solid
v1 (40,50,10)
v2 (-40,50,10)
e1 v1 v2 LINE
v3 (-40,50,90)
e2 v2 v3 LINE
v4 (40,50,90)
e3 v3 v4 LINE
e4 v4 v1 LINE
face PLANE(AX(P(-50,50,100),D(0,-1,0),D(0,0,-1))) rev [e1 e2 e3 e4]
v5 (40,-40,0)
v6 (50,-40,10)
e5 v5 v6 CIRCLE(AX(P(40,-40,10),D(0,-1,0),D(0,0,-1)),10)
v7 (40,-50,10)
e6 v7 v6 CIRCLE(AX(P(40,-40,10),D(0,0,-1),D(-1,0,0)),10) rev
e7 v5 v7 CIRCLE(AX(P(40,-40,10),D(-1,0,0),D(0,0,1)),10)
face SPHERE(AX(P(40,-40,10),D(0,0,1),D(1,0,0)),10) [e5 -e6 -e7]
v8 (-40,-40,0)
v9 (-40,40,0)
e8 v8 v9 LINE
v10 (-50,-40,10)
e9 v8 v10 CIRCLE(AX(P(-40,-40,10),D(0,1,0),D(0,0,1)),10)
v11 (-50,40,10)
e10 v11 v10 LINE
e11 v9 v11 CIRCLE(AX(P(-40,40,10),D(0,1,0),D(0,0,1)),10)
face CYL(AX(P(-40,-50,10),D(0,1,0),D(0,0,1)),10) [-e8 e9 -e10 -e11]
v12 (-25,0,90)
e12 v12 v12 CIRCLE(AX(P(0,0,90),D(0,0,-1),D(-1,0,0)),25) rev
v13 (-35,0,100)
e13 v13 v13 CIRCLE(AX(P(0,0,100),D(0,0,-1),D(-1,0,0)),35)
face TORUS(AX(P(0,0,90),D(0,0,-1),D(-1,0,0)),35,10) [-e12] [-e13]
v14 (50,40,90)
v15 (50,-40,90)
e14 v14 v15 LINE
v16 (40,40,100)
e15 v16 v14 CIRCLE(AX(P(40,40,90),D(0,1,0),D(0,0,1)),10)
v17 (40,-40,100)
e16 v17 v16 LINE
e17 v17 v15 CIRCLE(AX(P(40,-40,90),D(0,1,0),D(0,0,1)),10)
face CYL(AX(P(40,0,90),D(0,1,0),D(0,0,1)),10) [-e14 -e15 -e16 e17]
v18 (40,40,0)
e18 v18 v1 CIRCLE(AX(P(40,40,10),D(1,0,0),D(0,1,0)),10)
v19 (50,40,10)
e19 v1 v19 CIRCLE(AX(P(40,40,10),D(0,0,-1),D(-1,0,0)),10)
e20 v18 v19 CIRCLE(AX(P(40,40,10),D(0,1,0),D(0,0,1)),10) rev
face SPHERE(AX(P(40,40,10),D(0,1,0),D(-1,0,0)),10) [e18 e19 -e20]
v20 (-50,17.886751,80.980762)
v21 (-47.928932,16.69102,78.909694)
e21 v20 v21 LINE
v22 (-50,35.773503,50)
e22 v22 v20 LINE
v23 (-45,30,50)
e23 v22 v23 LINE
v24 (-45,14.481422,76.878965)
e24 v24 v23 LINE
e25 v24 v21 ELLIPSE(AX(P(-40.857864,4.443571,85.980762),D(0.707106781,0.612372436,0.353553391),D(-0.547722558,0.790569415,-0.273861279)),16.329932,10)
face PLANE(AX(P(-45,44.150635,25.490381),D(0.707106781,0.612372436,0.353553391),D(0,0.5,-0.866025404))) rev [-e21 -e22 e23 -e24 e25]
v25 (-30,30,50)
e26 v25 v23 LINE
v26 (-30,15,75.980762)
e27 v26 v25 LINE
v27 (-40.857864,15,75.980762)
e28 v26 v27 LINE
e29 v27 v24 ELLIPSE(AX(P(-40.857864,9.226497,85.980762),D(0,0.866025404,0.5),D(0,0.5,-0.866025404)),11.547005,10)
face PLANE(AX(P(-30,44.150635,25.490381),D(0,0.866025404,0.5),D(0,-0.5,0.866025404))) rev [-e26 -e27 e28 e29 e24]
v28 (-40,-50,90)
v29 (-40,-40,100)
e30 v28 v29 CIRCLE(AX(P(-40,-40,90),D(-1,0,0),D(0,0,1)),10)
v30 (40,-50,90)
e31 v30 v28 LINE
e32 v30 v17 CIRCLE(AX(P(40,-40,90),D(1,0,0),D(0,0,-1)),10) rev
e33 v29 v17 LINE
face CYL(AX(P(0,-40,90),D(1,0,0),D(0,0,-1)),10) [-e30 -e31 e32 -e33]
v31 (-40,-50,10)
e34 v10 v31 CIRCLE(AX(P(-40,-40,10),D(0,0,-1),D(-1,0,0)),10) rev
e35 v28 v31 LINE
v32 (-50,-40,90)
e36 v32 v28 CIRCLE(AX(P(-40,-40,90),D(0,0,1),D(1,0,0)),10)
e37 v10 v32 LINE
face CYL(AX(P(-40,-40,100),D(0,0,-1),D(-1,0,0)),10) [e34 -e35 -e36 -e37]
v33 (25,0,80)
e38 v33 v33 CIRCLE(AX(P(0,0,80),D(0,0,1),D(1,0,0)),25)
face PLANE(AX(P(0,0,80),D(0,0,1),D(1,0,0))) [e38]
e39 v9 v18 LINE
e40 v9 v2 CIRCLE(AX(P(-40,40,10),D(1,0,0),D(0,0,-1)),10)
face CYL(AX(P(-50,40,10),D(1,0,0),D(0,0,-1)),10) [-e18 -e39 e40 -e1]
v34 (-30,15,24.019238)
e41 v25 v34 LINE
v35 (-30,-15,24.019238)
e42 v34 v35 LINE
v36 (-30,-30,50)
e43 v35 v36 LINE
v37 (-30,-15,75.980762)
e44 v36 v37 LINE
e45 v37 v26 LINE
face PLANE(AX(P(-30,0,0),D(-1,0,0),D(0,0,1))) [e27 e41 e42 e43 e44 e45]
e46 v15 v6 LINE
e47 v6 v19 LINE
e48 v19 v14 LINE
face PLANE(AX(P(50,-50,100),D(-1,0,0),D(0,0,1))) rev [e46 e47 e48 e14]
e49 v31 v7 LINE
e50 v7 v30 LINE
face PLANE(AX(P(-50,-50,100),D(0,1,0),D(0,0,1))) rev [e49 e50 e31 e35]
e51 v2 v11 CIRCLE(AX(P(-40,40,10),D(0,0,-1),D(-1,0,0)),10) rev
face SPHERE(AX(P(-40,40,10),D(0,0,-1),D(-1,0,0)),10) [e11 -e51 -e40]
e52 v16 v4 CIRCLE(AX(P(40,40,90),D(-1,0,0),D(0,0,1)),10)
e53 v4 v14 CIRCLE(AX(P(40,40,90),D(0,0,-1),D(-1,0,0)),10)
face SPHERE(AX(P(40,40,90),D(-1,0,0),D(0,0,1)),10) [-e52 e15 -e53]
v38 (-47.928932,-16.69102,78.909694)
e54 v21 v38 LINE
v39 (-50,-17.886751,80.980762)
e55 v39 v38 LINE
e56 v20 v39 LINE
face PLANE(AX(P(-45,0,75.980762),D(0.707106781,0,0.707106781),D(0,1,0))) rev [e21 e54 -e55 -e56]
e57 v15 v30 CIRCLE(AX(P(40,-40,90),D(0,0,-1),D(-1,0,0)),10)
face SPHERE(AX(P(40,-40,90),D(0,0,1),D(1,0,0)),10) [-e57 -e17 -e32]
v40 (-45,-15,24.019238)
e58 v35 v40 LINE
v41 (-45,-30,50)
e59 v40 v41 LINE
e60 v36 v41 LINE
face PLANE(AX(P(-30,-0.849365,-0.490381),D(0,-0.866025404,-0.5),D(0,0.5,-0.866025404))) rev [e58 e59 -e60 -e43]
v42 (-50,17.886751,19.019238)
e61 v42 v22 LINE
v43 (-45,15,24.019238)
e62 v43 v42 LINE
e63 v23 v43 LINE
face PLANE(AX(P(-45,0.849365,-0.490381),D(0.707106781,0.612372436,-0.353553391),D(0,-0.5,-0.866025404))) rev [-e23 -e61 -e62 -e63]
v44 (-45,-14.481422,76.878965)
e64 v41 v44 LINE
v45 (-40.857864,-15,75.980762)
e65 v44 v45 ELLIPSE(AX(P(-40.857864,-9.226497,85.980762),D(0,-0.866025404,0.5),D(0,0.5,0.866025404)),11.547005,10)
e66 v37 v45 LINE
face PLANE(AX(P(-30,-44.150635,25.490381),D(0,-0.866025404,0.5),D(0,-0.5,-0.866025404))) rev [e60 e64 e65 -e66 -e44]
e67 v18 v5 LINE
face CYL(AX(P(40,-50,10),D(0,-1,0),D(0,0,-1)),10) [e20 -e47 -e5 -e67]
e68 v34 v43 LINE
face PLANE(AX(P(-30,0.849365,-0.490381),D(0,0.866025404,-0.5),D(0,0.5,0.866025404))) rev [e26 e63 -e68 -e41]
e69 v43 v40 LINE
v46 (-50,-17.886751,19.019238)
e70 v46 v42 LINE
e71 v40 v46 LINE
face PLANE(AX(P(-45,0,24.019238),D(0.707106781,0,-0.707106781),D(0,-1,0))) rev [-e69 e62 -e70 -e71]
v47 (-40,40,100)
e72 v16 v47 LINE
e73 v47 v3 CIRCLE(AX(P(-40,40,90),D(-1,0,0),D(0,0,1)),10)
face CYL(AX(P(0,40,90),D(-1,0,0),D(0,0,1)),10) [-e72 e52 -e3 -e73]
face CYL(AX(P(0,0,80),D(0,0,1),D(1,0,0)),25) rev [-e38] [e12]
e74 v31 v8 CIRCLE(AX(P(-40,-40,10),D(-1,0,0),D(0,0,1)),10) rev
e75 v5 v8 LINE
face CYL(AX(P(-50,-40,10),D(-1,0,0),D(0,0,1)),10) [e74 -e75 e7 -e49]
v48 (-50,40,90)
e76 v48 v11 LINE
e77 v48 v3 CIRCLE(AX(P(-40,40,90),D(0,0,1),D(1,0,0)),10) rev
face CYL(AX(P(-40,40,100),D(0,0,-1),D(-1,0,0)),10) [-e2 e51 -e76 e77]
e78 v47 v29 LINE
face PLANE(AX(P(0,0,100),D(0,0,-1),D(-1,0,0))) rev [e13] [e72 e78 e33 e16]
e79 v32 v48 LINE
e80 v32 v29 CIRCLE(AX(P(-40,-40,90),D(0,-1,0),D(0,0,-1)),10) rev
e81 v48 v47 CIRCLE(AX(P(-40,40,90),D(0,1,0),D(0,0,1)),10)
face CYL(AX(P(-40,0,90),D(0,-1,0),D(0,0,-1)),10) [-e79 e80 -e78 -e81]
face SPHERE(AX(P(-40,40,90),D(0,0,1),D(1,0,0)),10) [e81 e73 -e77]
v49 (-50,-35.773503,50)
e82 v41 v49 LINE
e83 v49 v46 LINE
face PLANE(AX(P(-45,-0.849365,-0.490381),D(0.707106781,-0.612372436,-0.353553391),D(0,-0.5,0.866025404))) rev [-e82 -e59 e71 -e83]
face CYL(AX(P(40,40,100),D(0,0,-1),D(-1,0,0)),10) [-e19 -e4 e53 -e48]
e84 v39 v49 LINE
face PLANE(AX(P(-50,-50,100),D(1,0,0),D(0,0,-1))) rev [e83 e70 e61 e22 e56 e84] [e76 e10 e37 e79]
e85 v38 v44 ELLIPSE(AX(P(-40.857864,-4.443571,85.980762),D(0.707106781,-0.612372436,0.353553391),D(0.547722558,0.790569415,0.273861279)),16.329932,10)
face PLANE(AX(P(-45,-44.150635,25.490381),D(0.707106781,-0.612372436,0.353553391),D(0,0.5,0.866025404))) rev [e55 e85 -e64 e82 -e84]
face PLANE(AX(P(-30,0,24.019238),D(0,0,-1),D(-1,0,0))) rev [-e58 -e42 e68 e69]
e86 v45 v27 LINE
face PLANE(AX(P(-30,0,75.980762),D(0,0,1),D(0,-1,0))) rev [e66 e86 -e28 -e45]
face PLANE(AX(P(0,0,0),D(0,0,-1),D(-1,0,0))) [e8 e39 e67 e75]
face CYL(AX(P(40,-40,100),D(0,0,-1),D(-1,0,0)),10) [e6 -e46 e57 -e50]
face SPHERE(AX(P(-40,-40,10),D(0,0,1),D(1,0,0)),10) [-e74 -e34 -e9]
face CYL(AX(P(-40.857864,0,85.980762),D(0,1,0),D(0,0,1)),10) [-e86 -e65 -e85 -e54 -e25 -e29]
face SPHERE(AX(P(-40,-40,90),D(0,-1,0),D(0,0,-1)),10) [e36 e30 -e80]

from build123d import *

# Parameters (mm, degrees)
SKETCH1_W           = 100
SKETCH1_H           = 100
BOSS_EXTRUDE1_DEPTH = 100
SKETCH2_R           = 25
CUT_EXTRUDE1_DEPTH  = 20
CUT_EXTRUDE3_DEPTH  = 20
CHAMFER1_SIZE       = 5
FILLET1_R           = 10
FILLET2_R           = 10
FILLET3_R           = 10


with BuildPart() as part:
    # Sketch1 → Boss-Extrude1 (new body)
    with BuildSketch(Plane.XY):
        Rectangle(SKETCH1_W, SKETCH1_H)
    extrude(amount=BOSS_EXTRUDE1_DEPTH)

    # Sketch2 → Cut-Extrude1 (cut)
    with BuildSketch(Plane.XY.offset(100)):
        Circle(SKETCH2_R)
    extrude(amount=-CUT_EXTRUDE1_DEPTH, mode=Mode.SUBTRACT)

    # Sketch6 → Cut-Extrude3 (cut)
    with BuildSketch(Plane.ZY.offset(50)):
        Polygon((69.019237886, -19.019237886), (30.980762114, 19.019237886), (24.019237886, 15), (24.019237886, -15), (50, -30), align=None)
        Polygon((50, 30), (30.980762114, 19.019237886), (69.019237886, -19.019237886), (75.980762114, -15), (75.980762114, 15), align=None)
    extrude(amount=-CUT_EXTRUDE3_DEPTH, mode=Mode.SUBTRACT)

    # Chamfer1
    chamfer1_edges = [part.edges().sort_by_distance(p)[0] for p in [
        (-50, -22.5, 37.009618943),
        (-50, -22.5, 62.990381057),
        (-50, 0, 75.980762114),
        (-50, 22.5, 62.990381057),
        (-50, 22.5, 37.009618943),
        (-50, 0, 24.019237886),
    ]]
    chamfer(chamfer1_edges, length=CHAMFER1_SIZE)

    # Fillet1
    fillet1_edges = [part.edges().sort_by_distance(p)[0] for p in [
        (-25, 0, 100),
    ]]
    fillet(fillet1_edges, radius=FILLET1_R)

    # Fillet2
    fillet2_edges = [part.edges().sort_by_distance(p)[0] for p in [
        (-50, 0, 100),
        (0, -50, 100),
        (0, -50, 0),
        (50, -50, 50),
        (-50, -50, 50),
        (-50, 50, 50),
        (0, 50, 100),
    ]]
    fillet(fillet2_edges, radius=FILLET2_R)

    # Fillet3
    # the kernel refuses this fillet: 10 mm, written as the material it takes off along each edge
    with BuildSketch(Plane(origin=(40, -40, 10), x_dir=(0, 0, -1), z_dir=(1, 0, 0))) as fillet3_piece_1_section:
        Polygon((0, 0), (FILLET3_R, 0), (FILLET3_R, -FILLET3_R), (0, -FILLET3_R), align=None)
    fillet3_piece_1 = extrude(amount=FILLET3_R, mode=Mode.PRIVATE)
    fillet3_piece_1 = fillet3_piece_1 - Plane(origin=(40, -40, 10), x_dir=(0, 0.7071067811865475, 0.7071067811865475), z_dir=(1, 0, 0)) * Sphere(FILLET3_R, mode=Mode.PRIVATE)
    add(fillet3_piece_1, mode=Mode.SUBTRACT)
    with BuildSketch(Plane(origin=(40, -40, 90), x_dir=(1, 0, 0), z_dir=(0, 0, 1))) as fillet3_piece_2_section:
        Polygon((0, 0), (FILLET3_R, 0), (FILLET3_R, -FILLET3_R), (0, -FILLET3_R), align=None)
    fillet3_piece_2 = extrude(amount=FILLET3_R, mode=Mode.PRIVATE)
    fillet3_piece_2 = fillet3_piece_2 - Plane(origin=(40, -40, 90), x_dir=(-0.7071067811865475, 0.7071067811865475, 0), z_dir=(0, 0, 1)) * Sphere(FILLET3_R, mode=Mode.PRIVATE)
    add(fillet3_piece_2, mode=Mode.SUBTRACT)
    with BuildSketch(Plane(origin=(-40, -40, 10), x_dir=(-1, 0, 0), z_dir=(0, 0, -1))) as fillet3_piece_3_section:
        Polygon((0, 0), (FILLET3_R, 0), (FILLET3_R, -FILLET3_R), (0, -FILLET3_R), align=None)
    fillet3_piece_3 = extrude(amount=FILLET3_R, mode=Mode.PRIVATE)
    fillet3_piece_3 = fillet3_piece_3 - Plane(origin=(-40, -40, 10), x_dir=(0.7071067811865475, 0.7071067811865475, 0), z_dir=(0, 0, -1)) * Sphere(FILLET3_R, mode=Mode.PRIVATE)
    add(fillet3_piece_3, mode=Mode.SUBTRACT)
    with BuildSketch(Plane(origin=(40, 40, 10), x_dir=(0, 1, 0), z_dir=(1, 0, 0))) as fillet3_piece_4_section:
        Polygon((0, 0), (FILLET3_R, 0), (FILLET3_R, -FILLET3_R), (0, -FILLET3_R), align=None)
    fillet3_piece_4 = extrude(amount=FILLET3_R, mode=Mode.PRIVATE)
    fillet3_piece_4 = fillet3_piece_4 - Plane(origin=(40, 40, 10), x_dir=(0, -0.7071067811865475, 0.7071067811865475), z_dir=(1, 0, 0)) * Sphere(FILLET3_R, mode=Mode.PRIVATE)
    add(fillet3_piece_4, mode=Mode.SUBTRACT)
    with BuildSketch(Plane(origin=(-45, -25.355339059, 75.980762114), x_dir=(-0.7071067811865476, 0, 0.7071067811865476), z_dir=(0, 1, 0))) as fillet3_piece_5_section:
        with BuildLine():
            CenterArc((FILLET3_R * 0.414213562373, FILLET3_R), FILLET3_R, 225, 45)
            Line((-FILLET3_R * 0.292893218813, FILLET3_R * 0.292893218813), (0, 0))
            Line((0, 0), (FILLET3_R * 0.414213562373, 0))
        make_face()
    fillet3_piece_5 = extrude(amount=50.710678119, mode=Mode.PRIVATE)
    fillet3_piece_5 = split(fillet3_piece_5, bisect_by=Plane(origin=(-43.280595019, -13.170460791, 75.710807016), z_dir=(0.7071067811865477, -0.6123724356957944, 0.35355339059327423)), keep=Keep.TOP, mode=Mode.PRIVATE)
    fillet3_piece_5 = split(fillet3_piece_5, bisect_by=Plane(origin=(-42.707460026, -14.659509184, 76.570509507), z_dir=(0, 0.8660254037844383, -0.5000000000000008)), keep=Keep.TOP, mode=Mode.PRIVATE)
    add(fillet3_piece_5, mode=Mode.SUBTRACT)
    with BuildSketch(Plane(origin=(-45, -25.355339059, 75.980762114), x_dir=(-0.7071067811865476, 0, 0.7071067811865476), z_dir=(0, 1, 0))) as fillet3_piece_6_section:
        with BuildLine():
            CenterArc((FILLET3_R * 0.414213562373, FILLET3_R), FILLET3_R, 225, 45)
            Line((-FILLET3_R * 0.292893218813, FILLET3_R * 0.292893218813), (0, 0))
            Line((0, 0), (FILLET3_R * 0.414213562373, 0))
        make_face()
    fillet3_piece_6 = extrude(amount=50.710678119, mode=Mode.PRIVATE)
    fillet3_piece_6 = split(fillet3_piece_6, bisect_by=Plane(origin=(-46.28634247, -15.385729384, 77.885344161), z_dir=(-0.7071067811865477, 0.6123724356957944, -0.35355339059327423)), keep=Keep.TOP, mode=Mode.PRIVATE)
    fillet3_piece_6 = split(fillet3_piece_6, bisect_by=Plane(origin=(-46.715123293, -14.271724128, 77.242172926), z_dir=(0, -0.8660254037844383, 0.5000000000000008)), keep=Keep.TOP, mode=Mode.PRIVATE)
    add(fillet3_piece_6, mode=Mode.SUBTRACT)
    with BuildSketch(Plane(origin=(-45, -25.355339059, 75.980762114), x_dir=(-0.7071067811865476, 0, 0.7071067811865476), z_dir=(0, 1, 0))) as fillet3_piece_7_section:
        with BuildLine():
            CenterArc((FILLET3_R * 0.414213562373, FILLET3_R), FILLET3_R, 225, 45)
            Line((-FILLET3_R * 0.292893218813, FILLET3_R * 0.292893218813), (0, 0))
            Line((0, 0), (FILLET3_R * 0.414213562373, 0))
        make_face()
    fillet3_piece_7 = extrude(amount=50.710678119, mode=Mode.PRIVATE)
    fillet3_piece_7 = split(fillet3_piece_7, bisect_by=Plane(origin=(-38.58008118, -5.415701855, 79.741415816), z_dir=(-0.7071067811865477, 0.6123724356957944, -0.35355339059327423)), keep=Keep.TOP, mode=Mode.PRIVATE)
    fillet3_piece_7 = split(fillet3_piece_7, bisect_by=Plane(origin=(-38.58008118, 5.415701855, 79.741415816), z_dir=(-0.7071067811865476, -0.6123724356957948, -0.3535533905932732)), keep=Keep.TOP, mode=Mode.PRIVATE)
    fillet3_piece_7 = split(fillet3_piece_7, bisect_by=Plane(origin=(-44.833595027, -10.975514643, 82.951375226), z_dir=(0, 0.8660254037844383, -0.5000000000000008)), keep=Keep.TOP, mode=Mode.PRIVATE)
    fillet3_piece_7 = split(fillet3_piece_7, bisect_by=Plane(origin=(-44.833595027, 10.975514643, 82.951375226), z_dir=(0, -0.8660254037844392, -0.49999999999999917)), keep=Keep.TOP, mode=Mode.PRIVATE)
    add(fillet3_piece_7, mode=Mode.SUBTRACT)
    with BuildSketch(Plane(origin=(-45, -25.355339059, 75.980762114), x_dir=(-0.7071067811865476, 0, 0.7071067811865476), z_dir=(0, 1, 0))) as fillet3_piece_8_section:
        with BuildLine():
            CenterArc((FILLET3_R * 0.414213562373, FILLET3_R), FILLET3_R, 225, 45)
            Line((-FILLET3_R * 0.292893218813, FILLET3_R * 0.292893218813), (0, 0))
            Line((0, 0), (FILLET3_R * 0.414213562373, 0))
        make_face()
    fillet3_piece_8 = extrude(amount=50.710678119, mode=Mode.PRIVATE)
    fillet3_piece_8 = split(fillet3_piece_8, bisect_by=Plane(origin=(-43.280595019, 13.170460791, 75.710807016), z_dir=(0.7071067811865476, 0.6123724356957948, 0.3535533905932732)), keep=Keep.TOP, mode=Mode.PRIVATE)
    fillet3_piece_8 = split(fillet3_piece_8, bisect_by=Plane(origin=(-42.707460026, 14.659509184, 76.570509507), z_dir=(0, -0.8660254037844392, -0.49999999999999917)), keep=Keep.TOP, mode=Mode.PRIVATE)
    add(fillet3_piece_8, mode=Mode.SUBTRACT)
    with BuildSketch(Plane(origin=(-45, -25.355339059, 75.980762114), x_dir=(-0.7071067811865476, 0, 0.7071067811865476), z_dir=(0, 1, 0))) as fillet3_piece_9_section:
        with BuildLine():
            CenterArc((FILLET3_R * 0.414213562373, FILLET3_R), FILLET3_R, 225, 45)
            Line((-FILLET3_R * 0.292893218813, FILLET3_R * 0.292893218813), (0, 0))
            Line((0, 0), (FILLET3_R * 0.414213562373, 0))
        make_face()
    fillet3_piece_9 = extrude(amount=50.710678119, mode=Mode.PRIVATE)
    fillet3_piece_9 = split(fillet3_piece_9, bisect_by=Plane(origin=(-46.28634247, 15.385729384, 77.885344161), z_dir=(-0.7071067811865476, -0.6123724356957948, -0.3535533905932732)), keep=Keep.TOP, mode=Mode.PRIVATE)
    fillet3_piece_9 = split(fillet3_piece_9, bisect_by=Plane(origin=(-46.715123293, 14.271724128, 77.242172926), z_dir=(0, 0.8660254037844392, 0.49999999999999917)), keep=Keep.TOP, mode=Mode.PRIVATE)
    add(fillet3_piece_9, mode=Mode.SUBTRACT)
    with BuildSketch(Plane(origin=(40, 50, 0), x_dir=(0, 0, 1), z_dir=(-1, 0, 0)), Plane(origin=(50, -40, 0), x_dir=(0, 0, 1), z_dir=(0, 1, 0)), Plane(origin=(50, 50, 10), x_dir=(0, -1, 0), z_dir=(0, 0, 1)), Plane(origin=(50, -40, 100), x_dir=(-1, 0, 0), z_dir=(0, 1, 0))) as fillet3_piece_10:
        with BuildLine():
            CenterArc((FILLET3_R, -FILLET3_R), FILLET3_R, 90, 90)
            Line((0, -FILLET3_R), (0, 0))
            Line((0, 0), (FILLET3_R, 0))
        make_face()
    extrude(amount=80, mode=Mode.SUBTRACT)
    with BuildSketch(Plane(origin=(-50, 40, 0), x_dir=(1, 0, 0), z_dir=(0, -1, 0))) as fillet3_piece_11:
        with BuildLine():
            CenterArc((FILLET3_R, FILLET3_R), FILLET3_R, 180, 90)
            Line((0, FILLET3_R), (0, 0))
            Line((0, 0), (FILLET3_R, 0))
        make_face()
    extrude(amount=80, mode=Mode.SUBTRACT)
    with BuildSketch(Plane(origin=(-40, 40, 0), x_dir=(-1, 0, 0), z_dir=(0, -1, 0))) as fillet3_piece_12:
        with BuildLine():
            CenterArc((10 - FILLET3_R, -FILLET3_R), FILLET3_R, 0, 90)
            Line((10, -FILLET3_R), (10, 0))
            Line((10, 0), (10 - FILLET3_R, 0))
        make_face()
    revolve(axis=Axis((-40, 40, 0), (0, 0, -1)), revolution_arc=90, mode=Mode.SUBTRACT)
    with BuildSketch(Plane(origin=(50, 40, 90), x_dir=(0, 0, 1), z_dir=(0, -1, 0))) as fillet3_piece_13:
        with BuildLine():
            CenterArc((10 - FILLET3_R, FILLET3_R), FILLET3_R, 270, 90)
            Line((10, FILLET3_R), (10, 0))
            Line((10, 0), (10 - FILLET3_R, 0))
        make_face()
    revolve(axis=Axis((50, 40, 90), (-1, 0, 0)), revolution_arc=90, mode=Mode.SUBTRACT)


solid = part.part
